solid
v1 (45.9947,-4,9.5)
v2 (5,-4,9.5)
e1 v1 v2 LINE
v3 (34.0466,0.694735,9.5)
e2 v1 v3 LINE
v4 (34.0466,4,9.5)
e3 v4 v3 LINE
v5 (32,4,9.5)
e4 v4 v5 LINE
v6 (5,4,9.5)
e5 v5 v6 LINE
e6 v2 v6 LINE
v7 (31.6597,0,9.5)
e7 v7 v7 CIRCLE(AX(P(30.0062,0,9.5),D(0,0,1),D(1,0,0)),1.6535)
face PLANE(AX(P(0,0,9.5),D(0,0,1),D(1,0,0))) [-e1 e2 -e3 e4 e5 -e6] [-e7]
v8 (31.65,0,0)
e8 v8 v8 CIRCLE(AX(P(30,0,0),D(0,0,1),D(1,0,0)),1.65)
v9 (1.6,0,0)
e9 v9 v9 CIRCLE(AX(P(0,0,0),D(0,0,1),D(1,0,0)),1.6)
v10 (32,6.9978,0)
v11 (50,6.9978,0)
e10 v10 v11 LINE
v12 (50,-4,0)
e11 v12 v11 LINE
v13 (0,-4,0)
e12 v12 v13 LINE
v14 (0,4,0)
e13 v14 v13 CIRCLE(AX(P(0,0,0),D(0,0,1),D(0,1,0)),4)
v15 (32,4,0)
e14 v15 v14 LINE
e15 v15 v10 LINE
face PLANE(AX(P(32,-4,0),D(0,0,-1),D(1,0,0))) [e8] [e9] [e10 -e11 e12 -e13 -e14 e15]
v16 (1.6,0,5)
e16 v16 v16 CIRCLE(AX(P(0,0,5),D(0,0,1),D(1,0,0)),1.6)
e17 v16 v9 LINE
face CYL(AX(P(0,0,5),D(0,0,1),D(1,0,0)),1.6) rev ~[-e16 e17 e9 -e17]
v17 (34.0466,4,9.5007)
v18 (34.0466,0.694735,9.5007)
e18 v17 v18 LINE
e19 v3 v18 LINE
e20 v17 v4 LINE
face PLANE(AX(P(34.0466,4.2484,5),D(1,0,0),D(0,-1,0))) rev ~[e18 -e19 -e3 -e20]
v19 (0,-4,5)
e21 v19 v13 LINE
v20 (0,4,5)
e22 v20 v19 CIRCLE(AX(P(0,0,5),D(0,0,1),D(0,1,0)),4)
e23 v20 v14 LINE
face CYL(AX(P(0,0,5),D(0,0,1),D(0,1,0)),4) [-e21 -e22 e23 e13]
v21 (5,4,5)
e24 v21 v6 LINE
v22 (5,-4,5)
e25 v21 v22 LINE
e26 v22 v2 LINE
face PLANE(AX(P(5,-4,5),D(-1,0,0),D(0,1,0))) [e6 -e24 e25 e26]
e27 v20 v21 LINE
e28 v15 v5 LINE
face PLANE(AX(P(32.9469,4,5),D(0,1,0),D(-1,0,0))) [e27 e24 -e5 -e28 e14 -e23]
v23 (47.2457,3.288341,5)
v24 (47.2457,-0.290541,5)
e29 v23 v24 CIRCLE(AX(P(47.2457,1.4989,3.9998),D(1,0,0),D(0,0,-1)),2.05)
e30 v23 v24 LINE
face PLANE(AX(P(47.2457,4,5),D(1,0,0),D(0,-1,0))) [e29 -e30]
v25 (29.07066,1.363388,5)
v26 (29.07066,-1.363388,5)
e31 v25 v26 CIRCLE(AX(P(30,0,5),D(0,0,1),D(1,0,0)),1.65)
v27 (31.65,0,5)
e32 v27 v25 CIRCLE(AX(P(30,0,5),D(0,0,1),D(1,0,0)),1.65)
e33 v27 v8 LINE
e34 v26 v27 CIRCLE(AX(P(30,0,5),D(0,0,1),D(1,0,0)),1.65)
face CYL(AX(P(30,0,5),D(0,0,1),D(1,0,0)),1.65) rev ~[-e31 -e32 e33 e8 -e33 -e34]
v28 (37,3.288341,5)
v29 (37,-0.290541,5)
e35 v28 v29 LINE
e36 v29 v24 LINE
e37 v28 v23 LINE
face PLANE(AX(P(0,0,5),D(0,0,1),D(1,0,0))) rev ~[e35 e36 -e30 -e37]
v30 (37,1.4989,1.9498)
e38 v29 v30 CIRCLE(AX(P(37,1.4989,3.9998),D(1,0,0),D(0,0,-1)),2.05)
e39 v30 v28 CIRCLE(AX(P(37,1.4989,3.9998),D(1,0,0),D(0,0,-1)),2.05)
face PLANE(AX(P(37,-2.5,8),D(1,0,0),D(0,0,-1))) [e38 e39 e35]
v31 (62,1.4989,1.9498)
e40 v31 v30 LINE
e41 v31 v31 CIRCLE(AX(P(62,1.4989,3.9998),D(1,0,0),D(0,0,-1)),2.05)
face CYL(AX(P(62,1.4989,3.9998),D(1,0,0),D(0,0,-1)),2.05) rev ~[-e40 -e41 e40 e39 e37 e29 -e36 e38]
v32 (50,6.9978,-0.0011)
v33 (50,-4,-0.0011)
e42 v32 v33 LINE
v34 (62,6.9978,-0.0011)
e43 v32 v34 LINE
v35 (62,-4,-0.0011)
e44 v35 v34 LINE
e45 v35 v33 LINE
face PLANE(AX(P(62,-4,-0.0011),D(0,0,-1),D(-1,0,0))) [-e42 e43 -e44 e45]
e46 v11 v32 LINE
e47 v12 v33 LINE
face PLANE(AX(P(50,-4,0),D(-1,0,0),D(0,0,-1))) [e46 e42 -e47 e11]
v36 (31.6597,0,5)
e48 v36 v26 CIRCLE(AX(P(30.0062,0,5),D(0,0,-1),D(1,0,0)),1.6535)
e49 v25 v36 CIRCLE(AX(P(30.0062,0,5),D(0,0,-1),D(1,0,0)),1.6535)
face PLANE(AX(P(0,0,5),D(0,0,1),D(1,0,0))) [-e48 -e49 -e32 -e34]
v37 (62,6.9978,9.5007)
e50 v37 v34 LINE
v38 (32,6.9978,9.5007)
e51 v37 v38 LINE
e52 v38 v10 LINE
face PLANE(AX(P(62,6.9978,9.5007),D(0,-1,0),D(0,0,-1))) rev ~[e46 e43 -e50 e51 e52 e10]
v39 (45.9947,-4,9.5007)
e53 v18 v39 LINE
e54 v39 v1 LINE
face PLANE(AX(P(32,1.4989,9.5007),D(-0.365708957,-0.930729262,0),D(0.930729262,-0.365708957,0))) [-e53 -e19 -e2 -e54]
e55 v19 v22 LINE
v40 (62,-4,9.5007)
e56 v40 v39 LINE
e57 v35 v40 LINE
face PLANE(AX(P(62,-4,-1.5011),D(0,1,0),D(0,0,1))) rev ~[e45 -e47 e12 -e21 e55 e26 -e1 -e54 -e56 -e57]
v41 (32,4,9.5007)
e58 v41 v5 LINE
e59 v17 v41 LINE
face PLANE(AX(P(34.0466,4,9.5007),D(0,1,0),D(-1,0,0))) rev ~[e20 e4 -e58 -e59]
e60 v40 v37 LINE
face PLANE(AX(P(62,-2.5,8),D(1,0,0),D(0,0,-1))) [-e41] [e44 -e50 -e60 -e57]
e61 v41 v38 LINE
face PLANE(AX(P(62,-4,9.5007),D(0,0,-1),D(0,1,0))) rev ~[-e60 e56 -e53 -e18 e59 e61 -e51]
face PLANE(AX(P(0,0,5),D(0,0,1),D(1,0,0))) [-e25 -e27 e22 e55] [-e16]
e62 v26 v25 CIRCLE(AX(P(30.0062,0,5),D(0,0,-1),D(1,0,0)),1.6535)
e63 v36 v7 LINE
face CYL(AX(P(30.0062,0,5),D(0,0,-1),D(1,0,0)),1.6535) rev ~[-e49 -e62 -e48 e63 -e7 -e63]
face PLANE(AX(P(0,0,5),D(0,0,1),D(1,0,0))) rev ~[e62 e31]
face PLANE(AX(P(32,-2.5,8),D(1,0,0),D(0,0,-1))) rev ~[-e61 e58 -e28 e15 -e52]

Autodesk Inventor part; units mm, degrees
ref_plane "YZ Plane" through (0, 0, 0) normal (1, 0, 0) x (0, 1, 0)
ref_plane "XZ Plane" through (0, 0, 0) normal (0, 1, 0) x (-1, 0, 0)
ref_plane "XY Plane" through (0, 0, 0) normal (0, 0, 1) x (1, 0, 0)
sketch "Sketch1" plane through (0, 0, 0) normal (0, 0, 1) x (1, 0, 0)
  line L0 (0, 0) -> (54, 0)
  circle A0 centre (0, 0) radius 1.55
  line L1 (0, 0) -> (10.0334, 0) construction
  line L2 (0, -2.5) -> (10.0334, -2.5)
  line L3 (10.0334, 2.5) -> (0, 2.5)
  arc A1 (0, 2.5) -> (0, -2.5) centre (0, 0) ccw
  arc A2 (10.0334, -2.5) -> (10.0334, 2.5) centre (10.0334, 0) ccw
  line L4 (0, 0) -> (54, 0) construction
  line L5 (0, -2.5) -> (54, -2.5)
  line L6 (54, 2.5) -> (0, 2.5)
  arc A3 (0, 2.5) -> (0, -2.5) centre (0, 0) ccw
  arc A4 (54, -2.5) -> (54, 2.5) centre (54, 0) ccw
  line L7 (54, 2.5) -> (54, -2.5)
  point P0 (5.0167, 0)
  point P1 (27, 0)
  dimension "d0" = 54
  dimension "d1" = 3.1
  dimension "d2" = 5
  dimension "d3" = 5
extrude "Extrusion1" add sketch "Sketch1" along normal blind 5 contours A2 L6 L7 L0 | L0 L7 L5 A2 | A2 L2 A1 L3
sketch "Sketch2" plane through (0, 0, 5) normal (0, 0, 1) x (1, 0, 0)
  point P0 (0, 0)
sketch "Sketch3" plane through (0, 0, 5) normal (0, 0, 1) x (1, 0, 0)
  circle A0 centre (20.0365, 0) radius 1.5
  point P0 (0, 0)
  dimension "d7" = 3
extrude "Extrusion2" cut sketch "Sketch3" against normal blind 5
sketch "Sketch4" plane through (0, 0, 5) normal (0, 0, 1) x (1, 0, 0)
  circle A0 centre (0, 0) radius 1.6
  circle A1 centre (20.0364, 0) radius 1.6
  dimension "d10" = 3.2
  dimension "d11" = 3.2
extrude "Extrusion3" cut sketch "Sketch4" against normal blind 5
sketch "Sketch5" plane through (0, 0, 5) normal (0, 0, 1) x (1, 0, 0)
  circle A0 centre (20.0364, 0) radius 1.6 projected
  circle A1 centre (20.0364, 0) radius 1.6
  line L0 (0, 0) -> (24, 0)
  circle A2 centre (24, 0) radius 1.65
  dimension "d14" = 3.2
  dimension "d15" = 24
  dimension "d16" = 3.3
extrude "Extrusion4" cut sketch "Sketch5" against normal blind 5 contours A2
extrude "Extrusion5" add sketch "Sketch5" against normal blind 5 contours L0 A0 | A0 L0
sketch "Sketch6" plane through (0, 0, 5) normal (0, 0, 1) x (1, 0, 0)
  line L0 (0, 0) -> (32, 0)
  line L1 (54, 2.5) -> (0, 2.5) projected
  line L2 (0, -2.5) -> (54, -2.5) projected
  line L3 (32, 2.5) -> (54, 2.5)
  line L4 (54, 2.5) -> (54, -2.5)
  line L5 (54, -2.5) -> (32, -2.5)
  line L6 (32, -2.5) -> (32, 2.5)
  dimension "d21" = 32
extrude "Extrusion6" add sketch "Sketch6" along normal blind 3
sketch "Sketch7" plane through (0, 2.5, 0) normal (0, 1, 0) x (1, 0, 0)
  line L0 (32, -8) -> (54, -8) projected
  line L1 (32, -8) -> (54, -8)
  line L2 (54, -8) -> (54, 0)
  line L3 (54, 0) -> (32, 0)
  line L4 (32, 0) -> (32, -8)
  point P0 (0, 0)
extrude "Extrusion7" add sketch "Sketch7" along normal blind 3
sketch "Sketch8" plane through (54, -2.5, 8) normal (1, 0, 0) x (0, 0, -1)
  line L0 (3, 0) -> (0, 0) projected
  line L1 (8, 5) -> (8, 8) projected
  line L2 (0, 0) -> (8, 0)
  line L3 (8, 0) -> (8, 8)
  line L4 (8, 8) -> (0, 8)
  line L5 (0, 8) -> (0, 0)
  point P0 (8, 2.5)
extrude "Extrusion8" add sketch "Sketch8" along normal blind 8
sketch "Sketch9" plane through (62, -2.5, 8) normal (1, 0, 0) x (0, 0, -1)
  circle A0 centre (4.0002, 3.9989) radius 2.05
  point P0 (8, 2.5)
  dimension "d28" = 4.1
extrude "Extrusion9" cut sketch "Sketch9" against normal blind 25
sketch "Sketch10" plane through (0, 0, 5) normal (0, 0, 1) x (1, 0, 0)
  point P0 (0, 0)
sketch "Sketch11" plane through (0, 0, 5) normal (0, 0, 1) x (1, 0, 0)
  circle A0 centre (0, 0) radius 1.6 projected
  circle A1 centre (0, 0) radius 1.65
  circle A2 centre (24.0003, 0) radius 1.65
  line L0 (0, 0) -> (32.9469, 0) construction
  line L1 (0, -4) -> (32.9469, -4)
  line L2 (32.9469, 4) -> (0, 4)
  arc A3 (0, 4) -> (0, -4) centre (0, 0) ccw
  arc A4 (32.9469, -4) -> (32.9469, 4) centre (32.9469, 0) ccw
  point P0 (16.4734, 0)
  dimension "d31" = 3.3
  dimension "d32" = 3.3
  dimension "d33" = 8
extrude "Extrusion10" add sketch "Sketch11" against normal blind 5 contours A3 L2 A4 L1
sketch "Sketch12" plane through (62, -2.5, 8) normal (1, 0, 0) x (0, 0, -1)
  line L0 (-1.5007, 9.4978) -> (9.5011, 9.4978)
  line L1 (9.5011, 9.4978) -> (9.5011, -1.5)
  line L2 (9.5011, -1.5) -> (-1.5007, -1.5)
  line L3 (-1.5007, -1.5) -> (-1.5007, 9.4978)
  circle A0 centre (4.0002, 3.9989) radius 2.05 projected
  line L4 (-1.5007, 9.4978) -> (9.5011, -1.5) construction
  line L5 (9.5011, 9.4978) -> (-1.5007, -1.5) construction
  circle A1 centre (4.0002, 3.9989) radius 2.05
  point P0 (8, 2.5)
extrude "Extrusion11" add sketch "Sketch12" against normal blind 30
sketch "Sketch13" plane through (0, -4, 5) normal (0, -1, 0) x (1, 0, 0)
  line L0 (32, -5) -> (32, 0) projected
  line L1 (62, -6.5011) -> (32, -6.5011) projected
  line L2 (32, -5) -> (50, -5)
  line L3 (50, -5) -> (50, -6.5011)
  line L4 (50, -6.5011) -> (32, -6.5011)
  line L5 (32, -6.5011) -> (32, -5)
  point P0 (0, -5)
  dimension "d38" = 18
extrude "Extrusion12" cut sketch "Sketch13" against normal blind 30
sketch "Sketch14" plane through (62, -4, 9.5007) normal (0, 0, 1) x (1, 0, 0)
  line L0 (-30, 0) -> (-30, 10.9978) projected
  line L1 (0, 0) -> (-30, 0) projected
  line L2 (-30, 5.4989) -> (-16.0053, 0)
  line L3 (-16.0053, 0) -> (-19.5106, -8.9209)
  line L4 (-19.5106, -8.9209) -> (-33.5053, -3.422)
  line L5 (-33.5053, -3.422) -> (-30, 5.4989)
  point P0 (-62, 4)
extrude "Extrusion13" cut sketch "Sketch14" against normal blind 4.5
sketch "Sketch15" plane through (0, 0, 5) normal (0, 0, 1) x (1, 0, 0)
  line L0 (0, 0) -> (30, 0)
  line L1 (32, -4) -> (32, 1.4989) projected
  circle A0 centre (30, 0) radius 1.65
  line L2 (34.0466, 0) -> (31.65, 0)
  line L3 (31.65, 0) -> (31.65, 4.2484)
  line L4 (31.65, 4.2484) -> (34.0466, 4.2484)
  line L5 (34.0466, 4.2484) -> (34.0466, 0)
  dimension "d43" = 30
  dimension "d44" = 3.3
extrude "Extrusion14" cut sketch "Sketch15" against normal blind 10 contours A0
extrude "Extrusion15" cut sketch "Sketch15" along normal blind 10 contours L3 L4 L5 L2
sketch "Sketch16" plane through (0, 0, 5) normal (0, 0, 1) x (1, 0, 0)
  circle A0 centre (24.0277, 0) radius 2.9708
  point P0 (0, 0)
extrude "Extrusion16" add sketch "Sketch16" against normal blind 5
sketch "Sketch17" plane through (62, -4, -1.5011) normal (0, 0, -1) x (-1, 0, 0)
  line L0 (-2.625, 12.9039) -> (17.8252, 12.9039)
  line L1 (17.8252, 12.9039) -> (17.8252, -5.3634)
  line L2 (17.8252, -5.3634) -> (-2.625, -5.3634)
  line L3 (-2.625, -5.3634) -> (-2.625, 12.9039)
  point P0 (62, 4)
extrude "Extrusion17" cut sketch "Sketch17" against normal blind 1.5
sketch "Sketch18" plane through (0, 0, 5) normal (0, 0, 1) x (1, 0, 0)
  circle A0 centre (0, 0) radius 1.6 projected
  line L0 (0, 0) -> (5, 0)
  line L1 (5, 0) -> (47.2457, 0)
  line L2 (47.2457, 0) -> (47.2457, -3.9214)
  line L3 (47.2457, -3.9214) -> (5, -3.9214)
  line L4 (5, -3.9214) -> (5, 0)
  line L5 (32, 4) -> (0, 4) projected
  line L6 (5, 4) -> (47.2457, 4)
  line L7 (47.2457, 4) -> (47.2457, -3.9214)
  line L8 (47.2457, -3.9214) -> (5, -3.9214)
  line L9 (5, -3.9214) -> (5, 4)
  circle A1 centre (30.0062, 0) radius 1.6535
  dimension "d53" = 5
extrude "Extrusion18" add sketch "Sketch18" along normal blind 4.5 contours A1 L1 L9 L5 L6 L7 | L1 L2 L3 L4 A1
sketch "Sketch19" plane through (5, -3.9214, 5) normal (0, -1, 0) x (1, 0, 0)
  point P0 (-5, -5)
sketch "Sketch20" plane through (0, 0, 5) normal (0, 0, 1) x (1, 0, 0)
  line L0 (5, -3.9214) -> (5, 4) projected
  line L1 (50, -4) -> (0, -4) projected
  line L2 (5, -2.1351) -> (48.5972, -2.1351)
  line L3 (48.5972, -2.1351) -> (48.5972, -4)
  line L4 (48.5972, -4) -> (5, -4)
  line L5 (5, -4) -> (5, -2.1351)
  point P0 (0, 0)
extrude "Extrusion19" add sketch "Sketch20" along normal blind 4.5
sketch "Sketch21" plane through (62, -4, 9.5007) normal (0, 0, 1) x (1, 0, 0)
  line L0 (-30, 8.2484) -> (-27.9534, 8.2484) projected
  line L1 (-27.9534, 8) -> (-57, 8) projected
  line L2 (-30, 8.2484) -> (-27.9534, 8.2484)
  line L3 (-27.9534, 8.2484) -> (-27.9534, 8)
  line L4 (-27.9534, 8) -> (-30, 8)
  line L5 (-30, 8) -> (-30, 8.2484)
  point P0 (-62, 4)
extrude "Extrusion20" add sketch "Sketch21" against normal blind 8
properties part number "arm"
